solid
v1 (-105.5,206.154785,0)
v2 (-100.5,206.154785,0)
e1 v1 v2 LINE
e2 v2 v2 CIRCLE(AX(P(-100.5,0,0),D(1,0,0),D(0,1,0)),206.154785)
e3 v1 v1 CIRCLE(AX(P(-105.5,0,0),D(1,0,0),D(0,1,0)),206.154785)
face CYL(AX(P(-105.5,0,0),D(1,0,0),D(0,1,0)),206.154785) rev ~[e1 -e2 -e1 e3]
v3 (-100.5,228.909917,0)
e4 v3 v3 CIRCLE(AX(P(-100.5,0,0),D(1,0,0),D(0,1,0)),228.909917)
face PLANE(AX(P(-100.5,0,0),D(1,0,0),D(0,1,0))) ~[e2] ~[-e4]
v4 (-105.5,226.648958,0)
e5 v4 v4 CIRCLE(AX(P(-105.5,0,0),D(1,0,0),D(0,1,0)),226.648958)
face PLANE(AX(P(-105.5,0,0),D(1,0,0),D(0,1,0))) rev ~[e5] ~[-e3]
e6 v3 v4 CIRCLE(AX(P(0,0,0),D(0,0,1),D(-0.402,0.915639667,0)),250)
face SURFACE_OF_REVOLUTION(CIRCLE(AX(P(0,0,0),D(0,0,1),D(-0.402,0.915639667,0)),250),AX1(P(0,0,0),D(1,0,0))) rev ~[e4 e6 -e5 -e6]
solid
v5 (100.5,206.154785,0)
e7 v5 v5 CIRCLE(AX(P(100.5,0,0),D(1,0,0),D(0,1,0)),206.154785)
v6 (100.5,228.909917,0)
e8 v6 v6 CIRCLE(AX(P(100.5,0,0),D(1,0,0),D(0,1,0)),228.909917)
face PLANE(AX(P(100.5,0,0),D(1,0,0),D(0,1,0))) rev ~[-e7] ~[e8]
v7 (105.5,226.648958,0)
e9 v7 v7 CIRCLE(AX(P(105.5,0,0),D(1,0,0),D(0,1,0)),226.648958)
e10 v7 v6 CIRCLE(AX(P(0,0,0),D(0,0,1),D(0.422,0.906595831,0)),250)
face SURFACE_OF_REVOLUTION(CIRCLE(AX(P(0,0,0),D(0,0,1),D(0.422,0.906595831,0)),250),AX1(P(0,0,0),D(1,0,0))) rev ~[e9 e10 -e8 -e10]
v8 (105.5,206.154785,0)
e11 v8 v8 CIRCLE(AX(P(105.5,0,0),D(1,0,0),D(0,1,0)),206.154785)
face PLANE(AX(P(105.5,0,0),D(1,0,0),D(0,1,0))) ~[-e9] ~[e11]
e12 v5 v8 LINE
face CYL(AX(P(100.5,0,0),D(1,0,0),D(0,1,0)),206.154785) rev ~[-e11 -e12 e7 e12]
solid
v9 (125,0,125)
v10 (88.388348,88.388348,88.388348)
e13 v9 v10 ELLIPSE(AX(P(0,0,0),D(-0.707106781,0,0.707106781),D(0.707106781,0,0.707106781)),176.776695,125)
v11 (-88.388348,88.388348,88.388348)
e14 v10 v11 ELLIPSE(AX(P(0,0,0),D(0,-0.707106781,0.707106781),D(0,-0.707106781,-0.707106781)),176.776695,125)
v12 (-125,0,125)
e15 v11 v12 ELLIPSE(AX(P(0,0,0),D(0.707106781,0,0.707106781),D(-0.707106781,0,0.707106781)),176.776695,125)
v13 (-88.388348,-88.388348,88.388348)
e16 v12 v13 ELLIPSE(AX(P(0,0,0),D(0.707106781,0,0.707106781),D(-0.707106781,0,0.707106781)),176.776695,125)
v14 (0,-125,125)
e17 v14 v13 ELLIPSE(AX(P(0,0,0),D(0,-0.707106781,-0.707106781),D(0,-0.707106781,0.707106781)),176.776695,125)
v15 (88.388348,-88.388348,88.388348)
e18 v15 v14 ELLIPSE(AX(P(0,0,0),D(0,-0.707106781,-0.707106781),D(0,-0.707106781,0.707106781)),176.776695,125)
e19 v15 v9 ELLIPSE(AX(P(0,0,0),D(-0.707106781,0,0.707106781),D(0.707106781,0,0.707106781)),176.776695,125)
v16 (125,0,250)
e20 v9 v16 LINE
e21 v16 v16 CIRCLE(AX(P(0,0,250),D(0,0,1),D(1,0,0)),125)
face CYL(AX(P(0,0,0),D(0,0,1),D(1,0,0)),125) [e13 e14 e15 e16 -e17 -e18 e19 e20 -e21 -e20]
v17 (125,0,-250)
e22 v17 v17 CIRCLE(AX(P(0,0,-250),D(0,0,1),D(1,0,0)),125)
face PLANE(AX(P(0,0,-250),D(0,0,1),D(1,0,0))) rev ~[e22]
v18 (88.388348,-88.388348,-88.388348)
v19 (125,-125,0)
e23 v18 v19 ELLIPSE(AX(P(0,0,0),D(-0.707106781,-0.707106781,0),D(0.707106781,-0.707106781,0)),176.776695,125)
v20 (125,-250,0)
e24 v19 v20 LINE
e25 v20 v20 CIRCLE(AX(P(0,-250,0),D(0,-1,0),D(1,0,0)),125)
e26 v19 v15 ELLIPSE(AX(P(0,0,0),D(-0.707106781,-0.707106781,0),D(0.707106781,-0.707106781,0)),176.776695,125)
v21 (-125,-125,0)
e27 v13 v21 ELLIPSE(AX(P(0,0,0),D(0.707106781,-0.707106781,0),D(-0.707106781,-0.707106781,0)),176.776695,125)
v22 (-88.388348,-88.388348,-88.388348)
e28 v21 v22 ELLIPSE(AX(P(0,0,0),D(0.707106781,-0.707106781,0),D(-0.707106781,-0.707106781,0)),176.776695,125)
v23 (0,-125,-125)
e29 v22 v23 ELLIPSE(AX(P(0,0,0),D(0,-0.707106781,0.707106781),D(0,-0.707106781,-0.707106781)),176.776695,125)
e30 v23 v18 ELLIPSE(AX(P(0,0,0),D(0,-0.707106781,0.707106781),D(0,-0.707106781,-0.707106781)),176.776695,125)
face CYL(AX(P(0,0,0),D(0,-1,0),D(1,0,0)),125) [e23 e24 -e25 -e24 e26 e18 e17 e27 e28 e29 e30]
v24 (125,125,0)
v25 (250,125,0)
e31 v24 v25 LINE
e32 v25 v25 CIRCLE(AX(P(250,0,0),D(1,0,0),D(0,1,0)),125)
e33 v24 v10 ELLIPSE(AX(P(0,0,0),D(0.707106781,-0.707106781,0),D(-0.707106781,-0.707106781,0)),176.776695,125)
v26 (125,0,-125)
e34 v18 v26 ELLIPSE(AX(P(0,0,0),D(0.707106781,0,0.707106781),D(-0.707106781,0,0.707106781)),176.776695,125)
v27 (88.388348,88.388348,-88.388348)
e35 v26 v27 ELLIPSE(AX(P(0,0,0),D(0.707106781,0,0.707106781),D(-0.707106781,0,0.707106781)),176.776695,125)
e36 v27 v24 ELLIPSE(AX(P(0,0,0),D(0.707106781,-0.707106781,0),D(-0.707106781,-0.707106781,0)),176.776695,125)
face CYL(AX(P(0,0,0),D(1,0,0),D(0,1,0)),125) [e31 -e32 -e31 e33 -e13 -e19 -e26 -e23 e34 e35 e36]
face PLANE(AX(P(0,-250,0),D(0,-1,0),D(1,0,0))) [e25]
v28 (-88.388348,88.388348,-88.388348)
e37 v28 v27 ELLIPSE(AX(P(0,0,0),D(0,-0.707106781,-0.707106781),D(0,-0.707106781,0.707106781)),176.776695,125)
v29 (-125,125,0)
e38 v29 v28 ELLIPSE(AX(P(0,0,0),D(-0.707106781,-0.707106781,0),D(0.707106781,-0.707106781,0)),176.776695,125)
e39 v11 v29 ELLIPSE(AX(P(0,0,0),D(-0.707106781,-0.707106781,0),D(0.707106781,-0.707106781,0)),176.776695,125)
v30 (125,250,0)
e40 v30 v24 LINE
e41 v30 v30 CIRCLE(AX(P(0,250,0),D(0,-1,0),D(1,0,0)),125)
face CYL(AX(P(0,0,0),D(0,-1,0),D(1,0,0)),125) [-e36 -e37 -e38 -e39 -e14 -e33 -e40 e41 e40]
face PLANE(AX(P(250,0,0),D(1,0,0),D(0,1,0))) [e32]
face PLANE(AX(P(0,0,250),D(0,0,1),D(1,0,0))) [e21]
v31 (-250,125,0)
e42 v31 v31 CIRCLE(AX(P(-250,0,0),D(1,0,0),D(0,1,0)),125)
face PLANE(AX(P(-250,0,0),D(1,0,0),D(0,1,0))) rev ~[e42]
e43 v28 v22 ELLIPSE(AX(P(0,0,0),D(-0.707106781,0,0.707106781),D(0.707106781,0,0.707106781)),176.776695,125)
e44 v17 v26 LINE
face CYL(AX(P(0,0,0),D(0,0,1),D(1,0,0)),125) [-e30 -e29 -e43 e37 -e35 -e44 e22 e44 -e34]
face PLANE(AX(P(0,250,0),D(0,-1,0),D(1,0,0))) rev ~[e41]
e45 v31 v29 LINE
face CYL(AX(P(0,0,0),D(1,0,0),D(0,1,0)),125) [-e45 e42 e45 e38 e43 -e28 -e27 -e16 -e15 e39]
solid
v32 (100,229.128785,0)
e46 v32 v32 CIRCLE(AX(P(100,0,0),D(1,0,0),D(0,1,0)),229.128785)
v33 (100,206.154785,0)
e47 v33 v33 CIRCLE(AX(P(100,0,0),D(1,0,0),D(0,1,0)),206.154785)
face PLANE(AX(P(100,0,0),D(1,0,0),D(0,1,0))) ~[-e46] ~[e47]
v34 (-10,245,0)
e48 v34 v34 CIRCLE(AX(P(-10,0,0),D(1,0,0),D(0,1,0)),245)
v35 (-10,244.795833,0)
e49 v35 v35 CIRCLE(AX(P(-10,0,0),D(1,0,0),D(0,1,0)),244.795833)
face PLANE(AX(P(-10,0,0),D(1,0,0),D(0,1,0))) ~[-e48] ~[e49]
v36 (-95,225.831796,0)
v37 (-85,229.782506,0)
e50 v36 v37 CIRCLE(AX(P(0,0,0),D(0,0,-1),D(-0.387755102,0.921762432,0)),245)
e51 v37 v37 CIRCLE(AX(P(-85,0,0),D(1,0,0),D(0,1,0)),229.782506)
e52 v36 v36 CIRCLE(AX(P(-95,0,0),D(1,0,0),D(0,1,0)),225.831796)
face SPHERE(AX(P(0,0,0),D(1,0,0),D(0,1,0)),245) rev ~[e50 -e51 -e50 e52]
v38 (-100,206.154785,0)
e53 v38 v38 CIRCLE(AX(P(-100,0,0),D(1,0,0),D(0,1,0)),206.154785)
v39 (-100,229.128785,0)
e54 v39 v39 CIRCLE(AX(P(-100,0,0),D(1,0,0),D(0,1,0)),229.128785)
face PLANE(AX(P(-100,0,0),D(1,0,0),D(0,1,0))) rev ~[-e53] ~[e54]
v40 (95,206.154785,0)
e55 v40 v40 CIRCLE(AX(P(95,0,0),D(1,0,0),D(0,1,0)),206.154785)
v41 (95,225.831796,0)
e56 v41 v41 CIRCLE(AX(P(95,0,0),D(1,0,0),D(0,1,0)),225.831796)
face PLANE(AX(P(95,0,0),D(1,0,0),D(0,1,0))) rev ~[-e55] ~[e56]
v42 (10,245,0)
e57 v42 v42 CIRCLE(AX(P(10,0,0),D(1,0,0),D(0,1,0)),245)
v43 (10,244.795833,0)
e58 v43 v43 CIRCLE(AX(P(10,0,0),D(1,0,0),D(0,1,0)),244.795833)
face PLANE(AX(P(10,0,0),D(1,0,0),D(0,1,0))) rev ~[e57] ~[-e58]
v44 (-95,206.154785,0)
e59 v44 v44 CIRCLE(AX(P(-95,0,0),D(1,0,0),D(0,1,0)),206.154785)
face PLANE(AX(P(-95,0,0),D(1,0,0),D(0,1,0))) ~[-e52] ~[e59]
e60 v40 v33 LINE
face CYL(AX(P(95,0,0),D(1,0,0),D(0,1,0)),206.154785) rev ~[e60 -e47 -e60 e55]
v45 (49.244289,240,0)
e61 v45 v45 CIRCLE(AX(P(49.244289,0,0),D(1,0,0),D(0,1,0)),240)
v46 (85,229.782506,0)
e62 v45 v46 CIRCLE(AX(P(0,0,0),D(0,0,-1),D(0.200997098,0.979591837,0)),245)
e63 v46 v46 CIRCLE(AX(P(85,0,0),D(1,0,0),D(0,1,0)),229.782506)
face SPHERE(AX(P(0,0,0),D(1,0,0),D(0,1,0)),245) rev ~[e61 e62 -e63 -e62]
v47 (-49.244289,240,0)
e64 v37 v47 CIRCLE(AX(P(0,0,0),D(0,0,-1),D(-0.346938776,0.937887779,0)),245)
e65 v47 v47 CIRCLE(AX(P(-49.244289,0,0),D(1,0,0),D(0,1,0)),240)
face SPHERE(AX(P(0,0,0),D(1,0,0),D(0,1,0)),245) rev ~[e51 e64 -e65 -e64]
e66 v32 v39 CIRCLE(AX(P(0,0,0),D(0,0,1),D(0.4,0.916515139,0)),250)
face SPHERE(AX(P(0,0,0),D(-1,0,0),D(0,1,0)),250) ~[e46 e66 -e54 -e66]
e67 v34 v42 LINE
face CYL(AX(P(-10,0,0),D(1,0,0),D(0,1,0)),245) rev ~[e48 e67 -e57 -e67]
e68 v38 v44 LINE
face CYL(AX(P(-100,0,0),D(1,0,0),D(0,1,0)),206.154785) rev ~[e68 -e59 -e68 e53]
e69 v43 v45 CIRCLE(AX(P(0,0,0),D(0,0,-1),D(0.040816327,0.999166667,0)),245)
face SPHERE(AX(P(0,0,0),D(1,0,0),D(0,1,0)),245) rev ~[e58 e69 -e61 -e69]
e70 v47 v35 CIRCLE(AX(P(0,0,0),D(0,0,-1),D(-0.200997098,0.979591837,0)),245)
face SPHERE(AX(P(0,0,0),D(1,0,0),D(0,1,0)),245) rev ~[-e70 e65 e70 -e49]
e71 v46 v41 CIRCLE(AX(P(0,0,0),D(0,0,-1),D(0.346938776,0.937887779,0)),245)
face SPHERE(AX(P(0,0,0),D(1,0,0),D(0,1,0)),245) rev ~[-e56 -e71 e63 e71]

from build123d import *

# Parameters (mm, degrees)
F2_R     = 125
F5_DEPTH = 250
F3_R     = 125
F6_DEPTH = 250
F1_R     = 125
F7_DEPTH = 250


with BuildPart() as f4:
    # F0 (on Top) → F4 (revolve)
    with BuildSketch(Plane.XY):
        with BuildLine():
            Line((-100.5, 206.1547847478), (-100.5, 228.9099167795))
            ThreePointArc((-100.5, 228.9099167795), (-103.0062036193, 227.7931562096), (-105.5, 226.6489576415))
            Line((-105.5, 226.6489576415), (-105.5, 215.5684346095))
            Line((-105.5, 215.5684346095), (-105.5, 206.1547847478))
            Line((-105.5, 206.1547847478), (-100.5, 206.1547847478))
        make_face()
    revolve(axis=Axis((0, 0, 0), (1, 0, 0)))


with BuildPart() as f4b:
    # F0 (on Top) → F4, piece 2 (revolve)
    with BuildSketch(Plane.XY):
        with BuildLine():
            Line((-95, 225), (-95, 225.8317958127))
            ThreePointArc((-95, 225.8317958127), (-90.0216753203, 227.8620152033), (-85, 229.7825058615))
            ThreePointArc((-85, 229.7825058615), (-67.3162801965, 235.5706229998), (-49.244289009, 240))
            ThreePointArc((-49.244289009, 240), (-29.7190418638, 243.1908274395), (-10, 244.7958332979))
            Line((-10, 244.7958332979), (-10, 245))
            Line((-10, 245), (3.458e-07, 245))
            Line((3.458e-07, 245), (10, 245))
            Line((10, 245), (10, 244.7958332979))
            ThreePointArc((10, 244.7958332979), (29.7190418638, 243.1908274395), (49.244289009, 240))
            ThreePointArc((49.244289009, 240), (67.3162801965, 235.5706229998), (85, 229.7825058615))
            ThreePointArc((85, 229.7825058615), (90.0216753203, 227.8620152033), (95, 225.8317958127))
            Line((95, 225.8317958127), (95, 225))
            Line((95, 225), (95, 206.1547847478))
            Line((95, 206.1547847478), (100, 206.1547847478))
            Line((100, 206.1547847478), (100, 229.1287847478))
            ThreePointArc((100, 229.1287847478), (0, 250), (-100, 229.1287847478))
            Line((-100, 229.1287847478), (-100, 206.1547847478))
            Line((-100, 206.1547847478), (-95, 206.1547847478))
            Line((-95, 206.1547847478), (-95, 225))
        make_face()
    revolve(axis=Axis((0, 0, 0), (1, 0, 0)))


with BuildPart() as f4c:
    # F0 (on Top) → F4, piece 3 (revolve)
    with BuildSketch(Plane.XY):
        with BuildLine():
            ThreePointArc((105.5, 226.6489576415), (103.0062036193, 227.7931562096), (100.5, 228.9099167795))
            Line((100.5, 228.9099167795), (100.5, 206.1547847478))
            Line((100.5, 206.1547847478), (105.5, 206.1547847478))
            Line((105.5, 206.1547847478), (105.5, 215.5684346095))
            Line((105.5, 215.5684346095), (105.5, 226.6489576415))
        make_face()
    revolve(axis=Axis((0, 0, 0), (1, 0, 0)))


with BuildPart() as f5:
    # F2 (on Front) → F5 (new body, symmetric)
    with BuildSketch(Plane.XZ):
        Circle(F2_R)
    extrude(amount=F5_DEPTH, both=True)

    # F3 (on Top) → F6 (join, symmetric)
    with BuildSketch(Plane.XY):
        Circle(F3_R)
    extrude(amount=F6_DEPTH, both=True)

    # F1 (on Right) → F7 (join, symmetric)
    with BuildSketch(Plane.YZ):
        Circle(F1_R)
    extrude(amount=F7_DEPTH, both=True)


solid = Compound([f4.part, f4b.part, f4c.part, f5.part])
